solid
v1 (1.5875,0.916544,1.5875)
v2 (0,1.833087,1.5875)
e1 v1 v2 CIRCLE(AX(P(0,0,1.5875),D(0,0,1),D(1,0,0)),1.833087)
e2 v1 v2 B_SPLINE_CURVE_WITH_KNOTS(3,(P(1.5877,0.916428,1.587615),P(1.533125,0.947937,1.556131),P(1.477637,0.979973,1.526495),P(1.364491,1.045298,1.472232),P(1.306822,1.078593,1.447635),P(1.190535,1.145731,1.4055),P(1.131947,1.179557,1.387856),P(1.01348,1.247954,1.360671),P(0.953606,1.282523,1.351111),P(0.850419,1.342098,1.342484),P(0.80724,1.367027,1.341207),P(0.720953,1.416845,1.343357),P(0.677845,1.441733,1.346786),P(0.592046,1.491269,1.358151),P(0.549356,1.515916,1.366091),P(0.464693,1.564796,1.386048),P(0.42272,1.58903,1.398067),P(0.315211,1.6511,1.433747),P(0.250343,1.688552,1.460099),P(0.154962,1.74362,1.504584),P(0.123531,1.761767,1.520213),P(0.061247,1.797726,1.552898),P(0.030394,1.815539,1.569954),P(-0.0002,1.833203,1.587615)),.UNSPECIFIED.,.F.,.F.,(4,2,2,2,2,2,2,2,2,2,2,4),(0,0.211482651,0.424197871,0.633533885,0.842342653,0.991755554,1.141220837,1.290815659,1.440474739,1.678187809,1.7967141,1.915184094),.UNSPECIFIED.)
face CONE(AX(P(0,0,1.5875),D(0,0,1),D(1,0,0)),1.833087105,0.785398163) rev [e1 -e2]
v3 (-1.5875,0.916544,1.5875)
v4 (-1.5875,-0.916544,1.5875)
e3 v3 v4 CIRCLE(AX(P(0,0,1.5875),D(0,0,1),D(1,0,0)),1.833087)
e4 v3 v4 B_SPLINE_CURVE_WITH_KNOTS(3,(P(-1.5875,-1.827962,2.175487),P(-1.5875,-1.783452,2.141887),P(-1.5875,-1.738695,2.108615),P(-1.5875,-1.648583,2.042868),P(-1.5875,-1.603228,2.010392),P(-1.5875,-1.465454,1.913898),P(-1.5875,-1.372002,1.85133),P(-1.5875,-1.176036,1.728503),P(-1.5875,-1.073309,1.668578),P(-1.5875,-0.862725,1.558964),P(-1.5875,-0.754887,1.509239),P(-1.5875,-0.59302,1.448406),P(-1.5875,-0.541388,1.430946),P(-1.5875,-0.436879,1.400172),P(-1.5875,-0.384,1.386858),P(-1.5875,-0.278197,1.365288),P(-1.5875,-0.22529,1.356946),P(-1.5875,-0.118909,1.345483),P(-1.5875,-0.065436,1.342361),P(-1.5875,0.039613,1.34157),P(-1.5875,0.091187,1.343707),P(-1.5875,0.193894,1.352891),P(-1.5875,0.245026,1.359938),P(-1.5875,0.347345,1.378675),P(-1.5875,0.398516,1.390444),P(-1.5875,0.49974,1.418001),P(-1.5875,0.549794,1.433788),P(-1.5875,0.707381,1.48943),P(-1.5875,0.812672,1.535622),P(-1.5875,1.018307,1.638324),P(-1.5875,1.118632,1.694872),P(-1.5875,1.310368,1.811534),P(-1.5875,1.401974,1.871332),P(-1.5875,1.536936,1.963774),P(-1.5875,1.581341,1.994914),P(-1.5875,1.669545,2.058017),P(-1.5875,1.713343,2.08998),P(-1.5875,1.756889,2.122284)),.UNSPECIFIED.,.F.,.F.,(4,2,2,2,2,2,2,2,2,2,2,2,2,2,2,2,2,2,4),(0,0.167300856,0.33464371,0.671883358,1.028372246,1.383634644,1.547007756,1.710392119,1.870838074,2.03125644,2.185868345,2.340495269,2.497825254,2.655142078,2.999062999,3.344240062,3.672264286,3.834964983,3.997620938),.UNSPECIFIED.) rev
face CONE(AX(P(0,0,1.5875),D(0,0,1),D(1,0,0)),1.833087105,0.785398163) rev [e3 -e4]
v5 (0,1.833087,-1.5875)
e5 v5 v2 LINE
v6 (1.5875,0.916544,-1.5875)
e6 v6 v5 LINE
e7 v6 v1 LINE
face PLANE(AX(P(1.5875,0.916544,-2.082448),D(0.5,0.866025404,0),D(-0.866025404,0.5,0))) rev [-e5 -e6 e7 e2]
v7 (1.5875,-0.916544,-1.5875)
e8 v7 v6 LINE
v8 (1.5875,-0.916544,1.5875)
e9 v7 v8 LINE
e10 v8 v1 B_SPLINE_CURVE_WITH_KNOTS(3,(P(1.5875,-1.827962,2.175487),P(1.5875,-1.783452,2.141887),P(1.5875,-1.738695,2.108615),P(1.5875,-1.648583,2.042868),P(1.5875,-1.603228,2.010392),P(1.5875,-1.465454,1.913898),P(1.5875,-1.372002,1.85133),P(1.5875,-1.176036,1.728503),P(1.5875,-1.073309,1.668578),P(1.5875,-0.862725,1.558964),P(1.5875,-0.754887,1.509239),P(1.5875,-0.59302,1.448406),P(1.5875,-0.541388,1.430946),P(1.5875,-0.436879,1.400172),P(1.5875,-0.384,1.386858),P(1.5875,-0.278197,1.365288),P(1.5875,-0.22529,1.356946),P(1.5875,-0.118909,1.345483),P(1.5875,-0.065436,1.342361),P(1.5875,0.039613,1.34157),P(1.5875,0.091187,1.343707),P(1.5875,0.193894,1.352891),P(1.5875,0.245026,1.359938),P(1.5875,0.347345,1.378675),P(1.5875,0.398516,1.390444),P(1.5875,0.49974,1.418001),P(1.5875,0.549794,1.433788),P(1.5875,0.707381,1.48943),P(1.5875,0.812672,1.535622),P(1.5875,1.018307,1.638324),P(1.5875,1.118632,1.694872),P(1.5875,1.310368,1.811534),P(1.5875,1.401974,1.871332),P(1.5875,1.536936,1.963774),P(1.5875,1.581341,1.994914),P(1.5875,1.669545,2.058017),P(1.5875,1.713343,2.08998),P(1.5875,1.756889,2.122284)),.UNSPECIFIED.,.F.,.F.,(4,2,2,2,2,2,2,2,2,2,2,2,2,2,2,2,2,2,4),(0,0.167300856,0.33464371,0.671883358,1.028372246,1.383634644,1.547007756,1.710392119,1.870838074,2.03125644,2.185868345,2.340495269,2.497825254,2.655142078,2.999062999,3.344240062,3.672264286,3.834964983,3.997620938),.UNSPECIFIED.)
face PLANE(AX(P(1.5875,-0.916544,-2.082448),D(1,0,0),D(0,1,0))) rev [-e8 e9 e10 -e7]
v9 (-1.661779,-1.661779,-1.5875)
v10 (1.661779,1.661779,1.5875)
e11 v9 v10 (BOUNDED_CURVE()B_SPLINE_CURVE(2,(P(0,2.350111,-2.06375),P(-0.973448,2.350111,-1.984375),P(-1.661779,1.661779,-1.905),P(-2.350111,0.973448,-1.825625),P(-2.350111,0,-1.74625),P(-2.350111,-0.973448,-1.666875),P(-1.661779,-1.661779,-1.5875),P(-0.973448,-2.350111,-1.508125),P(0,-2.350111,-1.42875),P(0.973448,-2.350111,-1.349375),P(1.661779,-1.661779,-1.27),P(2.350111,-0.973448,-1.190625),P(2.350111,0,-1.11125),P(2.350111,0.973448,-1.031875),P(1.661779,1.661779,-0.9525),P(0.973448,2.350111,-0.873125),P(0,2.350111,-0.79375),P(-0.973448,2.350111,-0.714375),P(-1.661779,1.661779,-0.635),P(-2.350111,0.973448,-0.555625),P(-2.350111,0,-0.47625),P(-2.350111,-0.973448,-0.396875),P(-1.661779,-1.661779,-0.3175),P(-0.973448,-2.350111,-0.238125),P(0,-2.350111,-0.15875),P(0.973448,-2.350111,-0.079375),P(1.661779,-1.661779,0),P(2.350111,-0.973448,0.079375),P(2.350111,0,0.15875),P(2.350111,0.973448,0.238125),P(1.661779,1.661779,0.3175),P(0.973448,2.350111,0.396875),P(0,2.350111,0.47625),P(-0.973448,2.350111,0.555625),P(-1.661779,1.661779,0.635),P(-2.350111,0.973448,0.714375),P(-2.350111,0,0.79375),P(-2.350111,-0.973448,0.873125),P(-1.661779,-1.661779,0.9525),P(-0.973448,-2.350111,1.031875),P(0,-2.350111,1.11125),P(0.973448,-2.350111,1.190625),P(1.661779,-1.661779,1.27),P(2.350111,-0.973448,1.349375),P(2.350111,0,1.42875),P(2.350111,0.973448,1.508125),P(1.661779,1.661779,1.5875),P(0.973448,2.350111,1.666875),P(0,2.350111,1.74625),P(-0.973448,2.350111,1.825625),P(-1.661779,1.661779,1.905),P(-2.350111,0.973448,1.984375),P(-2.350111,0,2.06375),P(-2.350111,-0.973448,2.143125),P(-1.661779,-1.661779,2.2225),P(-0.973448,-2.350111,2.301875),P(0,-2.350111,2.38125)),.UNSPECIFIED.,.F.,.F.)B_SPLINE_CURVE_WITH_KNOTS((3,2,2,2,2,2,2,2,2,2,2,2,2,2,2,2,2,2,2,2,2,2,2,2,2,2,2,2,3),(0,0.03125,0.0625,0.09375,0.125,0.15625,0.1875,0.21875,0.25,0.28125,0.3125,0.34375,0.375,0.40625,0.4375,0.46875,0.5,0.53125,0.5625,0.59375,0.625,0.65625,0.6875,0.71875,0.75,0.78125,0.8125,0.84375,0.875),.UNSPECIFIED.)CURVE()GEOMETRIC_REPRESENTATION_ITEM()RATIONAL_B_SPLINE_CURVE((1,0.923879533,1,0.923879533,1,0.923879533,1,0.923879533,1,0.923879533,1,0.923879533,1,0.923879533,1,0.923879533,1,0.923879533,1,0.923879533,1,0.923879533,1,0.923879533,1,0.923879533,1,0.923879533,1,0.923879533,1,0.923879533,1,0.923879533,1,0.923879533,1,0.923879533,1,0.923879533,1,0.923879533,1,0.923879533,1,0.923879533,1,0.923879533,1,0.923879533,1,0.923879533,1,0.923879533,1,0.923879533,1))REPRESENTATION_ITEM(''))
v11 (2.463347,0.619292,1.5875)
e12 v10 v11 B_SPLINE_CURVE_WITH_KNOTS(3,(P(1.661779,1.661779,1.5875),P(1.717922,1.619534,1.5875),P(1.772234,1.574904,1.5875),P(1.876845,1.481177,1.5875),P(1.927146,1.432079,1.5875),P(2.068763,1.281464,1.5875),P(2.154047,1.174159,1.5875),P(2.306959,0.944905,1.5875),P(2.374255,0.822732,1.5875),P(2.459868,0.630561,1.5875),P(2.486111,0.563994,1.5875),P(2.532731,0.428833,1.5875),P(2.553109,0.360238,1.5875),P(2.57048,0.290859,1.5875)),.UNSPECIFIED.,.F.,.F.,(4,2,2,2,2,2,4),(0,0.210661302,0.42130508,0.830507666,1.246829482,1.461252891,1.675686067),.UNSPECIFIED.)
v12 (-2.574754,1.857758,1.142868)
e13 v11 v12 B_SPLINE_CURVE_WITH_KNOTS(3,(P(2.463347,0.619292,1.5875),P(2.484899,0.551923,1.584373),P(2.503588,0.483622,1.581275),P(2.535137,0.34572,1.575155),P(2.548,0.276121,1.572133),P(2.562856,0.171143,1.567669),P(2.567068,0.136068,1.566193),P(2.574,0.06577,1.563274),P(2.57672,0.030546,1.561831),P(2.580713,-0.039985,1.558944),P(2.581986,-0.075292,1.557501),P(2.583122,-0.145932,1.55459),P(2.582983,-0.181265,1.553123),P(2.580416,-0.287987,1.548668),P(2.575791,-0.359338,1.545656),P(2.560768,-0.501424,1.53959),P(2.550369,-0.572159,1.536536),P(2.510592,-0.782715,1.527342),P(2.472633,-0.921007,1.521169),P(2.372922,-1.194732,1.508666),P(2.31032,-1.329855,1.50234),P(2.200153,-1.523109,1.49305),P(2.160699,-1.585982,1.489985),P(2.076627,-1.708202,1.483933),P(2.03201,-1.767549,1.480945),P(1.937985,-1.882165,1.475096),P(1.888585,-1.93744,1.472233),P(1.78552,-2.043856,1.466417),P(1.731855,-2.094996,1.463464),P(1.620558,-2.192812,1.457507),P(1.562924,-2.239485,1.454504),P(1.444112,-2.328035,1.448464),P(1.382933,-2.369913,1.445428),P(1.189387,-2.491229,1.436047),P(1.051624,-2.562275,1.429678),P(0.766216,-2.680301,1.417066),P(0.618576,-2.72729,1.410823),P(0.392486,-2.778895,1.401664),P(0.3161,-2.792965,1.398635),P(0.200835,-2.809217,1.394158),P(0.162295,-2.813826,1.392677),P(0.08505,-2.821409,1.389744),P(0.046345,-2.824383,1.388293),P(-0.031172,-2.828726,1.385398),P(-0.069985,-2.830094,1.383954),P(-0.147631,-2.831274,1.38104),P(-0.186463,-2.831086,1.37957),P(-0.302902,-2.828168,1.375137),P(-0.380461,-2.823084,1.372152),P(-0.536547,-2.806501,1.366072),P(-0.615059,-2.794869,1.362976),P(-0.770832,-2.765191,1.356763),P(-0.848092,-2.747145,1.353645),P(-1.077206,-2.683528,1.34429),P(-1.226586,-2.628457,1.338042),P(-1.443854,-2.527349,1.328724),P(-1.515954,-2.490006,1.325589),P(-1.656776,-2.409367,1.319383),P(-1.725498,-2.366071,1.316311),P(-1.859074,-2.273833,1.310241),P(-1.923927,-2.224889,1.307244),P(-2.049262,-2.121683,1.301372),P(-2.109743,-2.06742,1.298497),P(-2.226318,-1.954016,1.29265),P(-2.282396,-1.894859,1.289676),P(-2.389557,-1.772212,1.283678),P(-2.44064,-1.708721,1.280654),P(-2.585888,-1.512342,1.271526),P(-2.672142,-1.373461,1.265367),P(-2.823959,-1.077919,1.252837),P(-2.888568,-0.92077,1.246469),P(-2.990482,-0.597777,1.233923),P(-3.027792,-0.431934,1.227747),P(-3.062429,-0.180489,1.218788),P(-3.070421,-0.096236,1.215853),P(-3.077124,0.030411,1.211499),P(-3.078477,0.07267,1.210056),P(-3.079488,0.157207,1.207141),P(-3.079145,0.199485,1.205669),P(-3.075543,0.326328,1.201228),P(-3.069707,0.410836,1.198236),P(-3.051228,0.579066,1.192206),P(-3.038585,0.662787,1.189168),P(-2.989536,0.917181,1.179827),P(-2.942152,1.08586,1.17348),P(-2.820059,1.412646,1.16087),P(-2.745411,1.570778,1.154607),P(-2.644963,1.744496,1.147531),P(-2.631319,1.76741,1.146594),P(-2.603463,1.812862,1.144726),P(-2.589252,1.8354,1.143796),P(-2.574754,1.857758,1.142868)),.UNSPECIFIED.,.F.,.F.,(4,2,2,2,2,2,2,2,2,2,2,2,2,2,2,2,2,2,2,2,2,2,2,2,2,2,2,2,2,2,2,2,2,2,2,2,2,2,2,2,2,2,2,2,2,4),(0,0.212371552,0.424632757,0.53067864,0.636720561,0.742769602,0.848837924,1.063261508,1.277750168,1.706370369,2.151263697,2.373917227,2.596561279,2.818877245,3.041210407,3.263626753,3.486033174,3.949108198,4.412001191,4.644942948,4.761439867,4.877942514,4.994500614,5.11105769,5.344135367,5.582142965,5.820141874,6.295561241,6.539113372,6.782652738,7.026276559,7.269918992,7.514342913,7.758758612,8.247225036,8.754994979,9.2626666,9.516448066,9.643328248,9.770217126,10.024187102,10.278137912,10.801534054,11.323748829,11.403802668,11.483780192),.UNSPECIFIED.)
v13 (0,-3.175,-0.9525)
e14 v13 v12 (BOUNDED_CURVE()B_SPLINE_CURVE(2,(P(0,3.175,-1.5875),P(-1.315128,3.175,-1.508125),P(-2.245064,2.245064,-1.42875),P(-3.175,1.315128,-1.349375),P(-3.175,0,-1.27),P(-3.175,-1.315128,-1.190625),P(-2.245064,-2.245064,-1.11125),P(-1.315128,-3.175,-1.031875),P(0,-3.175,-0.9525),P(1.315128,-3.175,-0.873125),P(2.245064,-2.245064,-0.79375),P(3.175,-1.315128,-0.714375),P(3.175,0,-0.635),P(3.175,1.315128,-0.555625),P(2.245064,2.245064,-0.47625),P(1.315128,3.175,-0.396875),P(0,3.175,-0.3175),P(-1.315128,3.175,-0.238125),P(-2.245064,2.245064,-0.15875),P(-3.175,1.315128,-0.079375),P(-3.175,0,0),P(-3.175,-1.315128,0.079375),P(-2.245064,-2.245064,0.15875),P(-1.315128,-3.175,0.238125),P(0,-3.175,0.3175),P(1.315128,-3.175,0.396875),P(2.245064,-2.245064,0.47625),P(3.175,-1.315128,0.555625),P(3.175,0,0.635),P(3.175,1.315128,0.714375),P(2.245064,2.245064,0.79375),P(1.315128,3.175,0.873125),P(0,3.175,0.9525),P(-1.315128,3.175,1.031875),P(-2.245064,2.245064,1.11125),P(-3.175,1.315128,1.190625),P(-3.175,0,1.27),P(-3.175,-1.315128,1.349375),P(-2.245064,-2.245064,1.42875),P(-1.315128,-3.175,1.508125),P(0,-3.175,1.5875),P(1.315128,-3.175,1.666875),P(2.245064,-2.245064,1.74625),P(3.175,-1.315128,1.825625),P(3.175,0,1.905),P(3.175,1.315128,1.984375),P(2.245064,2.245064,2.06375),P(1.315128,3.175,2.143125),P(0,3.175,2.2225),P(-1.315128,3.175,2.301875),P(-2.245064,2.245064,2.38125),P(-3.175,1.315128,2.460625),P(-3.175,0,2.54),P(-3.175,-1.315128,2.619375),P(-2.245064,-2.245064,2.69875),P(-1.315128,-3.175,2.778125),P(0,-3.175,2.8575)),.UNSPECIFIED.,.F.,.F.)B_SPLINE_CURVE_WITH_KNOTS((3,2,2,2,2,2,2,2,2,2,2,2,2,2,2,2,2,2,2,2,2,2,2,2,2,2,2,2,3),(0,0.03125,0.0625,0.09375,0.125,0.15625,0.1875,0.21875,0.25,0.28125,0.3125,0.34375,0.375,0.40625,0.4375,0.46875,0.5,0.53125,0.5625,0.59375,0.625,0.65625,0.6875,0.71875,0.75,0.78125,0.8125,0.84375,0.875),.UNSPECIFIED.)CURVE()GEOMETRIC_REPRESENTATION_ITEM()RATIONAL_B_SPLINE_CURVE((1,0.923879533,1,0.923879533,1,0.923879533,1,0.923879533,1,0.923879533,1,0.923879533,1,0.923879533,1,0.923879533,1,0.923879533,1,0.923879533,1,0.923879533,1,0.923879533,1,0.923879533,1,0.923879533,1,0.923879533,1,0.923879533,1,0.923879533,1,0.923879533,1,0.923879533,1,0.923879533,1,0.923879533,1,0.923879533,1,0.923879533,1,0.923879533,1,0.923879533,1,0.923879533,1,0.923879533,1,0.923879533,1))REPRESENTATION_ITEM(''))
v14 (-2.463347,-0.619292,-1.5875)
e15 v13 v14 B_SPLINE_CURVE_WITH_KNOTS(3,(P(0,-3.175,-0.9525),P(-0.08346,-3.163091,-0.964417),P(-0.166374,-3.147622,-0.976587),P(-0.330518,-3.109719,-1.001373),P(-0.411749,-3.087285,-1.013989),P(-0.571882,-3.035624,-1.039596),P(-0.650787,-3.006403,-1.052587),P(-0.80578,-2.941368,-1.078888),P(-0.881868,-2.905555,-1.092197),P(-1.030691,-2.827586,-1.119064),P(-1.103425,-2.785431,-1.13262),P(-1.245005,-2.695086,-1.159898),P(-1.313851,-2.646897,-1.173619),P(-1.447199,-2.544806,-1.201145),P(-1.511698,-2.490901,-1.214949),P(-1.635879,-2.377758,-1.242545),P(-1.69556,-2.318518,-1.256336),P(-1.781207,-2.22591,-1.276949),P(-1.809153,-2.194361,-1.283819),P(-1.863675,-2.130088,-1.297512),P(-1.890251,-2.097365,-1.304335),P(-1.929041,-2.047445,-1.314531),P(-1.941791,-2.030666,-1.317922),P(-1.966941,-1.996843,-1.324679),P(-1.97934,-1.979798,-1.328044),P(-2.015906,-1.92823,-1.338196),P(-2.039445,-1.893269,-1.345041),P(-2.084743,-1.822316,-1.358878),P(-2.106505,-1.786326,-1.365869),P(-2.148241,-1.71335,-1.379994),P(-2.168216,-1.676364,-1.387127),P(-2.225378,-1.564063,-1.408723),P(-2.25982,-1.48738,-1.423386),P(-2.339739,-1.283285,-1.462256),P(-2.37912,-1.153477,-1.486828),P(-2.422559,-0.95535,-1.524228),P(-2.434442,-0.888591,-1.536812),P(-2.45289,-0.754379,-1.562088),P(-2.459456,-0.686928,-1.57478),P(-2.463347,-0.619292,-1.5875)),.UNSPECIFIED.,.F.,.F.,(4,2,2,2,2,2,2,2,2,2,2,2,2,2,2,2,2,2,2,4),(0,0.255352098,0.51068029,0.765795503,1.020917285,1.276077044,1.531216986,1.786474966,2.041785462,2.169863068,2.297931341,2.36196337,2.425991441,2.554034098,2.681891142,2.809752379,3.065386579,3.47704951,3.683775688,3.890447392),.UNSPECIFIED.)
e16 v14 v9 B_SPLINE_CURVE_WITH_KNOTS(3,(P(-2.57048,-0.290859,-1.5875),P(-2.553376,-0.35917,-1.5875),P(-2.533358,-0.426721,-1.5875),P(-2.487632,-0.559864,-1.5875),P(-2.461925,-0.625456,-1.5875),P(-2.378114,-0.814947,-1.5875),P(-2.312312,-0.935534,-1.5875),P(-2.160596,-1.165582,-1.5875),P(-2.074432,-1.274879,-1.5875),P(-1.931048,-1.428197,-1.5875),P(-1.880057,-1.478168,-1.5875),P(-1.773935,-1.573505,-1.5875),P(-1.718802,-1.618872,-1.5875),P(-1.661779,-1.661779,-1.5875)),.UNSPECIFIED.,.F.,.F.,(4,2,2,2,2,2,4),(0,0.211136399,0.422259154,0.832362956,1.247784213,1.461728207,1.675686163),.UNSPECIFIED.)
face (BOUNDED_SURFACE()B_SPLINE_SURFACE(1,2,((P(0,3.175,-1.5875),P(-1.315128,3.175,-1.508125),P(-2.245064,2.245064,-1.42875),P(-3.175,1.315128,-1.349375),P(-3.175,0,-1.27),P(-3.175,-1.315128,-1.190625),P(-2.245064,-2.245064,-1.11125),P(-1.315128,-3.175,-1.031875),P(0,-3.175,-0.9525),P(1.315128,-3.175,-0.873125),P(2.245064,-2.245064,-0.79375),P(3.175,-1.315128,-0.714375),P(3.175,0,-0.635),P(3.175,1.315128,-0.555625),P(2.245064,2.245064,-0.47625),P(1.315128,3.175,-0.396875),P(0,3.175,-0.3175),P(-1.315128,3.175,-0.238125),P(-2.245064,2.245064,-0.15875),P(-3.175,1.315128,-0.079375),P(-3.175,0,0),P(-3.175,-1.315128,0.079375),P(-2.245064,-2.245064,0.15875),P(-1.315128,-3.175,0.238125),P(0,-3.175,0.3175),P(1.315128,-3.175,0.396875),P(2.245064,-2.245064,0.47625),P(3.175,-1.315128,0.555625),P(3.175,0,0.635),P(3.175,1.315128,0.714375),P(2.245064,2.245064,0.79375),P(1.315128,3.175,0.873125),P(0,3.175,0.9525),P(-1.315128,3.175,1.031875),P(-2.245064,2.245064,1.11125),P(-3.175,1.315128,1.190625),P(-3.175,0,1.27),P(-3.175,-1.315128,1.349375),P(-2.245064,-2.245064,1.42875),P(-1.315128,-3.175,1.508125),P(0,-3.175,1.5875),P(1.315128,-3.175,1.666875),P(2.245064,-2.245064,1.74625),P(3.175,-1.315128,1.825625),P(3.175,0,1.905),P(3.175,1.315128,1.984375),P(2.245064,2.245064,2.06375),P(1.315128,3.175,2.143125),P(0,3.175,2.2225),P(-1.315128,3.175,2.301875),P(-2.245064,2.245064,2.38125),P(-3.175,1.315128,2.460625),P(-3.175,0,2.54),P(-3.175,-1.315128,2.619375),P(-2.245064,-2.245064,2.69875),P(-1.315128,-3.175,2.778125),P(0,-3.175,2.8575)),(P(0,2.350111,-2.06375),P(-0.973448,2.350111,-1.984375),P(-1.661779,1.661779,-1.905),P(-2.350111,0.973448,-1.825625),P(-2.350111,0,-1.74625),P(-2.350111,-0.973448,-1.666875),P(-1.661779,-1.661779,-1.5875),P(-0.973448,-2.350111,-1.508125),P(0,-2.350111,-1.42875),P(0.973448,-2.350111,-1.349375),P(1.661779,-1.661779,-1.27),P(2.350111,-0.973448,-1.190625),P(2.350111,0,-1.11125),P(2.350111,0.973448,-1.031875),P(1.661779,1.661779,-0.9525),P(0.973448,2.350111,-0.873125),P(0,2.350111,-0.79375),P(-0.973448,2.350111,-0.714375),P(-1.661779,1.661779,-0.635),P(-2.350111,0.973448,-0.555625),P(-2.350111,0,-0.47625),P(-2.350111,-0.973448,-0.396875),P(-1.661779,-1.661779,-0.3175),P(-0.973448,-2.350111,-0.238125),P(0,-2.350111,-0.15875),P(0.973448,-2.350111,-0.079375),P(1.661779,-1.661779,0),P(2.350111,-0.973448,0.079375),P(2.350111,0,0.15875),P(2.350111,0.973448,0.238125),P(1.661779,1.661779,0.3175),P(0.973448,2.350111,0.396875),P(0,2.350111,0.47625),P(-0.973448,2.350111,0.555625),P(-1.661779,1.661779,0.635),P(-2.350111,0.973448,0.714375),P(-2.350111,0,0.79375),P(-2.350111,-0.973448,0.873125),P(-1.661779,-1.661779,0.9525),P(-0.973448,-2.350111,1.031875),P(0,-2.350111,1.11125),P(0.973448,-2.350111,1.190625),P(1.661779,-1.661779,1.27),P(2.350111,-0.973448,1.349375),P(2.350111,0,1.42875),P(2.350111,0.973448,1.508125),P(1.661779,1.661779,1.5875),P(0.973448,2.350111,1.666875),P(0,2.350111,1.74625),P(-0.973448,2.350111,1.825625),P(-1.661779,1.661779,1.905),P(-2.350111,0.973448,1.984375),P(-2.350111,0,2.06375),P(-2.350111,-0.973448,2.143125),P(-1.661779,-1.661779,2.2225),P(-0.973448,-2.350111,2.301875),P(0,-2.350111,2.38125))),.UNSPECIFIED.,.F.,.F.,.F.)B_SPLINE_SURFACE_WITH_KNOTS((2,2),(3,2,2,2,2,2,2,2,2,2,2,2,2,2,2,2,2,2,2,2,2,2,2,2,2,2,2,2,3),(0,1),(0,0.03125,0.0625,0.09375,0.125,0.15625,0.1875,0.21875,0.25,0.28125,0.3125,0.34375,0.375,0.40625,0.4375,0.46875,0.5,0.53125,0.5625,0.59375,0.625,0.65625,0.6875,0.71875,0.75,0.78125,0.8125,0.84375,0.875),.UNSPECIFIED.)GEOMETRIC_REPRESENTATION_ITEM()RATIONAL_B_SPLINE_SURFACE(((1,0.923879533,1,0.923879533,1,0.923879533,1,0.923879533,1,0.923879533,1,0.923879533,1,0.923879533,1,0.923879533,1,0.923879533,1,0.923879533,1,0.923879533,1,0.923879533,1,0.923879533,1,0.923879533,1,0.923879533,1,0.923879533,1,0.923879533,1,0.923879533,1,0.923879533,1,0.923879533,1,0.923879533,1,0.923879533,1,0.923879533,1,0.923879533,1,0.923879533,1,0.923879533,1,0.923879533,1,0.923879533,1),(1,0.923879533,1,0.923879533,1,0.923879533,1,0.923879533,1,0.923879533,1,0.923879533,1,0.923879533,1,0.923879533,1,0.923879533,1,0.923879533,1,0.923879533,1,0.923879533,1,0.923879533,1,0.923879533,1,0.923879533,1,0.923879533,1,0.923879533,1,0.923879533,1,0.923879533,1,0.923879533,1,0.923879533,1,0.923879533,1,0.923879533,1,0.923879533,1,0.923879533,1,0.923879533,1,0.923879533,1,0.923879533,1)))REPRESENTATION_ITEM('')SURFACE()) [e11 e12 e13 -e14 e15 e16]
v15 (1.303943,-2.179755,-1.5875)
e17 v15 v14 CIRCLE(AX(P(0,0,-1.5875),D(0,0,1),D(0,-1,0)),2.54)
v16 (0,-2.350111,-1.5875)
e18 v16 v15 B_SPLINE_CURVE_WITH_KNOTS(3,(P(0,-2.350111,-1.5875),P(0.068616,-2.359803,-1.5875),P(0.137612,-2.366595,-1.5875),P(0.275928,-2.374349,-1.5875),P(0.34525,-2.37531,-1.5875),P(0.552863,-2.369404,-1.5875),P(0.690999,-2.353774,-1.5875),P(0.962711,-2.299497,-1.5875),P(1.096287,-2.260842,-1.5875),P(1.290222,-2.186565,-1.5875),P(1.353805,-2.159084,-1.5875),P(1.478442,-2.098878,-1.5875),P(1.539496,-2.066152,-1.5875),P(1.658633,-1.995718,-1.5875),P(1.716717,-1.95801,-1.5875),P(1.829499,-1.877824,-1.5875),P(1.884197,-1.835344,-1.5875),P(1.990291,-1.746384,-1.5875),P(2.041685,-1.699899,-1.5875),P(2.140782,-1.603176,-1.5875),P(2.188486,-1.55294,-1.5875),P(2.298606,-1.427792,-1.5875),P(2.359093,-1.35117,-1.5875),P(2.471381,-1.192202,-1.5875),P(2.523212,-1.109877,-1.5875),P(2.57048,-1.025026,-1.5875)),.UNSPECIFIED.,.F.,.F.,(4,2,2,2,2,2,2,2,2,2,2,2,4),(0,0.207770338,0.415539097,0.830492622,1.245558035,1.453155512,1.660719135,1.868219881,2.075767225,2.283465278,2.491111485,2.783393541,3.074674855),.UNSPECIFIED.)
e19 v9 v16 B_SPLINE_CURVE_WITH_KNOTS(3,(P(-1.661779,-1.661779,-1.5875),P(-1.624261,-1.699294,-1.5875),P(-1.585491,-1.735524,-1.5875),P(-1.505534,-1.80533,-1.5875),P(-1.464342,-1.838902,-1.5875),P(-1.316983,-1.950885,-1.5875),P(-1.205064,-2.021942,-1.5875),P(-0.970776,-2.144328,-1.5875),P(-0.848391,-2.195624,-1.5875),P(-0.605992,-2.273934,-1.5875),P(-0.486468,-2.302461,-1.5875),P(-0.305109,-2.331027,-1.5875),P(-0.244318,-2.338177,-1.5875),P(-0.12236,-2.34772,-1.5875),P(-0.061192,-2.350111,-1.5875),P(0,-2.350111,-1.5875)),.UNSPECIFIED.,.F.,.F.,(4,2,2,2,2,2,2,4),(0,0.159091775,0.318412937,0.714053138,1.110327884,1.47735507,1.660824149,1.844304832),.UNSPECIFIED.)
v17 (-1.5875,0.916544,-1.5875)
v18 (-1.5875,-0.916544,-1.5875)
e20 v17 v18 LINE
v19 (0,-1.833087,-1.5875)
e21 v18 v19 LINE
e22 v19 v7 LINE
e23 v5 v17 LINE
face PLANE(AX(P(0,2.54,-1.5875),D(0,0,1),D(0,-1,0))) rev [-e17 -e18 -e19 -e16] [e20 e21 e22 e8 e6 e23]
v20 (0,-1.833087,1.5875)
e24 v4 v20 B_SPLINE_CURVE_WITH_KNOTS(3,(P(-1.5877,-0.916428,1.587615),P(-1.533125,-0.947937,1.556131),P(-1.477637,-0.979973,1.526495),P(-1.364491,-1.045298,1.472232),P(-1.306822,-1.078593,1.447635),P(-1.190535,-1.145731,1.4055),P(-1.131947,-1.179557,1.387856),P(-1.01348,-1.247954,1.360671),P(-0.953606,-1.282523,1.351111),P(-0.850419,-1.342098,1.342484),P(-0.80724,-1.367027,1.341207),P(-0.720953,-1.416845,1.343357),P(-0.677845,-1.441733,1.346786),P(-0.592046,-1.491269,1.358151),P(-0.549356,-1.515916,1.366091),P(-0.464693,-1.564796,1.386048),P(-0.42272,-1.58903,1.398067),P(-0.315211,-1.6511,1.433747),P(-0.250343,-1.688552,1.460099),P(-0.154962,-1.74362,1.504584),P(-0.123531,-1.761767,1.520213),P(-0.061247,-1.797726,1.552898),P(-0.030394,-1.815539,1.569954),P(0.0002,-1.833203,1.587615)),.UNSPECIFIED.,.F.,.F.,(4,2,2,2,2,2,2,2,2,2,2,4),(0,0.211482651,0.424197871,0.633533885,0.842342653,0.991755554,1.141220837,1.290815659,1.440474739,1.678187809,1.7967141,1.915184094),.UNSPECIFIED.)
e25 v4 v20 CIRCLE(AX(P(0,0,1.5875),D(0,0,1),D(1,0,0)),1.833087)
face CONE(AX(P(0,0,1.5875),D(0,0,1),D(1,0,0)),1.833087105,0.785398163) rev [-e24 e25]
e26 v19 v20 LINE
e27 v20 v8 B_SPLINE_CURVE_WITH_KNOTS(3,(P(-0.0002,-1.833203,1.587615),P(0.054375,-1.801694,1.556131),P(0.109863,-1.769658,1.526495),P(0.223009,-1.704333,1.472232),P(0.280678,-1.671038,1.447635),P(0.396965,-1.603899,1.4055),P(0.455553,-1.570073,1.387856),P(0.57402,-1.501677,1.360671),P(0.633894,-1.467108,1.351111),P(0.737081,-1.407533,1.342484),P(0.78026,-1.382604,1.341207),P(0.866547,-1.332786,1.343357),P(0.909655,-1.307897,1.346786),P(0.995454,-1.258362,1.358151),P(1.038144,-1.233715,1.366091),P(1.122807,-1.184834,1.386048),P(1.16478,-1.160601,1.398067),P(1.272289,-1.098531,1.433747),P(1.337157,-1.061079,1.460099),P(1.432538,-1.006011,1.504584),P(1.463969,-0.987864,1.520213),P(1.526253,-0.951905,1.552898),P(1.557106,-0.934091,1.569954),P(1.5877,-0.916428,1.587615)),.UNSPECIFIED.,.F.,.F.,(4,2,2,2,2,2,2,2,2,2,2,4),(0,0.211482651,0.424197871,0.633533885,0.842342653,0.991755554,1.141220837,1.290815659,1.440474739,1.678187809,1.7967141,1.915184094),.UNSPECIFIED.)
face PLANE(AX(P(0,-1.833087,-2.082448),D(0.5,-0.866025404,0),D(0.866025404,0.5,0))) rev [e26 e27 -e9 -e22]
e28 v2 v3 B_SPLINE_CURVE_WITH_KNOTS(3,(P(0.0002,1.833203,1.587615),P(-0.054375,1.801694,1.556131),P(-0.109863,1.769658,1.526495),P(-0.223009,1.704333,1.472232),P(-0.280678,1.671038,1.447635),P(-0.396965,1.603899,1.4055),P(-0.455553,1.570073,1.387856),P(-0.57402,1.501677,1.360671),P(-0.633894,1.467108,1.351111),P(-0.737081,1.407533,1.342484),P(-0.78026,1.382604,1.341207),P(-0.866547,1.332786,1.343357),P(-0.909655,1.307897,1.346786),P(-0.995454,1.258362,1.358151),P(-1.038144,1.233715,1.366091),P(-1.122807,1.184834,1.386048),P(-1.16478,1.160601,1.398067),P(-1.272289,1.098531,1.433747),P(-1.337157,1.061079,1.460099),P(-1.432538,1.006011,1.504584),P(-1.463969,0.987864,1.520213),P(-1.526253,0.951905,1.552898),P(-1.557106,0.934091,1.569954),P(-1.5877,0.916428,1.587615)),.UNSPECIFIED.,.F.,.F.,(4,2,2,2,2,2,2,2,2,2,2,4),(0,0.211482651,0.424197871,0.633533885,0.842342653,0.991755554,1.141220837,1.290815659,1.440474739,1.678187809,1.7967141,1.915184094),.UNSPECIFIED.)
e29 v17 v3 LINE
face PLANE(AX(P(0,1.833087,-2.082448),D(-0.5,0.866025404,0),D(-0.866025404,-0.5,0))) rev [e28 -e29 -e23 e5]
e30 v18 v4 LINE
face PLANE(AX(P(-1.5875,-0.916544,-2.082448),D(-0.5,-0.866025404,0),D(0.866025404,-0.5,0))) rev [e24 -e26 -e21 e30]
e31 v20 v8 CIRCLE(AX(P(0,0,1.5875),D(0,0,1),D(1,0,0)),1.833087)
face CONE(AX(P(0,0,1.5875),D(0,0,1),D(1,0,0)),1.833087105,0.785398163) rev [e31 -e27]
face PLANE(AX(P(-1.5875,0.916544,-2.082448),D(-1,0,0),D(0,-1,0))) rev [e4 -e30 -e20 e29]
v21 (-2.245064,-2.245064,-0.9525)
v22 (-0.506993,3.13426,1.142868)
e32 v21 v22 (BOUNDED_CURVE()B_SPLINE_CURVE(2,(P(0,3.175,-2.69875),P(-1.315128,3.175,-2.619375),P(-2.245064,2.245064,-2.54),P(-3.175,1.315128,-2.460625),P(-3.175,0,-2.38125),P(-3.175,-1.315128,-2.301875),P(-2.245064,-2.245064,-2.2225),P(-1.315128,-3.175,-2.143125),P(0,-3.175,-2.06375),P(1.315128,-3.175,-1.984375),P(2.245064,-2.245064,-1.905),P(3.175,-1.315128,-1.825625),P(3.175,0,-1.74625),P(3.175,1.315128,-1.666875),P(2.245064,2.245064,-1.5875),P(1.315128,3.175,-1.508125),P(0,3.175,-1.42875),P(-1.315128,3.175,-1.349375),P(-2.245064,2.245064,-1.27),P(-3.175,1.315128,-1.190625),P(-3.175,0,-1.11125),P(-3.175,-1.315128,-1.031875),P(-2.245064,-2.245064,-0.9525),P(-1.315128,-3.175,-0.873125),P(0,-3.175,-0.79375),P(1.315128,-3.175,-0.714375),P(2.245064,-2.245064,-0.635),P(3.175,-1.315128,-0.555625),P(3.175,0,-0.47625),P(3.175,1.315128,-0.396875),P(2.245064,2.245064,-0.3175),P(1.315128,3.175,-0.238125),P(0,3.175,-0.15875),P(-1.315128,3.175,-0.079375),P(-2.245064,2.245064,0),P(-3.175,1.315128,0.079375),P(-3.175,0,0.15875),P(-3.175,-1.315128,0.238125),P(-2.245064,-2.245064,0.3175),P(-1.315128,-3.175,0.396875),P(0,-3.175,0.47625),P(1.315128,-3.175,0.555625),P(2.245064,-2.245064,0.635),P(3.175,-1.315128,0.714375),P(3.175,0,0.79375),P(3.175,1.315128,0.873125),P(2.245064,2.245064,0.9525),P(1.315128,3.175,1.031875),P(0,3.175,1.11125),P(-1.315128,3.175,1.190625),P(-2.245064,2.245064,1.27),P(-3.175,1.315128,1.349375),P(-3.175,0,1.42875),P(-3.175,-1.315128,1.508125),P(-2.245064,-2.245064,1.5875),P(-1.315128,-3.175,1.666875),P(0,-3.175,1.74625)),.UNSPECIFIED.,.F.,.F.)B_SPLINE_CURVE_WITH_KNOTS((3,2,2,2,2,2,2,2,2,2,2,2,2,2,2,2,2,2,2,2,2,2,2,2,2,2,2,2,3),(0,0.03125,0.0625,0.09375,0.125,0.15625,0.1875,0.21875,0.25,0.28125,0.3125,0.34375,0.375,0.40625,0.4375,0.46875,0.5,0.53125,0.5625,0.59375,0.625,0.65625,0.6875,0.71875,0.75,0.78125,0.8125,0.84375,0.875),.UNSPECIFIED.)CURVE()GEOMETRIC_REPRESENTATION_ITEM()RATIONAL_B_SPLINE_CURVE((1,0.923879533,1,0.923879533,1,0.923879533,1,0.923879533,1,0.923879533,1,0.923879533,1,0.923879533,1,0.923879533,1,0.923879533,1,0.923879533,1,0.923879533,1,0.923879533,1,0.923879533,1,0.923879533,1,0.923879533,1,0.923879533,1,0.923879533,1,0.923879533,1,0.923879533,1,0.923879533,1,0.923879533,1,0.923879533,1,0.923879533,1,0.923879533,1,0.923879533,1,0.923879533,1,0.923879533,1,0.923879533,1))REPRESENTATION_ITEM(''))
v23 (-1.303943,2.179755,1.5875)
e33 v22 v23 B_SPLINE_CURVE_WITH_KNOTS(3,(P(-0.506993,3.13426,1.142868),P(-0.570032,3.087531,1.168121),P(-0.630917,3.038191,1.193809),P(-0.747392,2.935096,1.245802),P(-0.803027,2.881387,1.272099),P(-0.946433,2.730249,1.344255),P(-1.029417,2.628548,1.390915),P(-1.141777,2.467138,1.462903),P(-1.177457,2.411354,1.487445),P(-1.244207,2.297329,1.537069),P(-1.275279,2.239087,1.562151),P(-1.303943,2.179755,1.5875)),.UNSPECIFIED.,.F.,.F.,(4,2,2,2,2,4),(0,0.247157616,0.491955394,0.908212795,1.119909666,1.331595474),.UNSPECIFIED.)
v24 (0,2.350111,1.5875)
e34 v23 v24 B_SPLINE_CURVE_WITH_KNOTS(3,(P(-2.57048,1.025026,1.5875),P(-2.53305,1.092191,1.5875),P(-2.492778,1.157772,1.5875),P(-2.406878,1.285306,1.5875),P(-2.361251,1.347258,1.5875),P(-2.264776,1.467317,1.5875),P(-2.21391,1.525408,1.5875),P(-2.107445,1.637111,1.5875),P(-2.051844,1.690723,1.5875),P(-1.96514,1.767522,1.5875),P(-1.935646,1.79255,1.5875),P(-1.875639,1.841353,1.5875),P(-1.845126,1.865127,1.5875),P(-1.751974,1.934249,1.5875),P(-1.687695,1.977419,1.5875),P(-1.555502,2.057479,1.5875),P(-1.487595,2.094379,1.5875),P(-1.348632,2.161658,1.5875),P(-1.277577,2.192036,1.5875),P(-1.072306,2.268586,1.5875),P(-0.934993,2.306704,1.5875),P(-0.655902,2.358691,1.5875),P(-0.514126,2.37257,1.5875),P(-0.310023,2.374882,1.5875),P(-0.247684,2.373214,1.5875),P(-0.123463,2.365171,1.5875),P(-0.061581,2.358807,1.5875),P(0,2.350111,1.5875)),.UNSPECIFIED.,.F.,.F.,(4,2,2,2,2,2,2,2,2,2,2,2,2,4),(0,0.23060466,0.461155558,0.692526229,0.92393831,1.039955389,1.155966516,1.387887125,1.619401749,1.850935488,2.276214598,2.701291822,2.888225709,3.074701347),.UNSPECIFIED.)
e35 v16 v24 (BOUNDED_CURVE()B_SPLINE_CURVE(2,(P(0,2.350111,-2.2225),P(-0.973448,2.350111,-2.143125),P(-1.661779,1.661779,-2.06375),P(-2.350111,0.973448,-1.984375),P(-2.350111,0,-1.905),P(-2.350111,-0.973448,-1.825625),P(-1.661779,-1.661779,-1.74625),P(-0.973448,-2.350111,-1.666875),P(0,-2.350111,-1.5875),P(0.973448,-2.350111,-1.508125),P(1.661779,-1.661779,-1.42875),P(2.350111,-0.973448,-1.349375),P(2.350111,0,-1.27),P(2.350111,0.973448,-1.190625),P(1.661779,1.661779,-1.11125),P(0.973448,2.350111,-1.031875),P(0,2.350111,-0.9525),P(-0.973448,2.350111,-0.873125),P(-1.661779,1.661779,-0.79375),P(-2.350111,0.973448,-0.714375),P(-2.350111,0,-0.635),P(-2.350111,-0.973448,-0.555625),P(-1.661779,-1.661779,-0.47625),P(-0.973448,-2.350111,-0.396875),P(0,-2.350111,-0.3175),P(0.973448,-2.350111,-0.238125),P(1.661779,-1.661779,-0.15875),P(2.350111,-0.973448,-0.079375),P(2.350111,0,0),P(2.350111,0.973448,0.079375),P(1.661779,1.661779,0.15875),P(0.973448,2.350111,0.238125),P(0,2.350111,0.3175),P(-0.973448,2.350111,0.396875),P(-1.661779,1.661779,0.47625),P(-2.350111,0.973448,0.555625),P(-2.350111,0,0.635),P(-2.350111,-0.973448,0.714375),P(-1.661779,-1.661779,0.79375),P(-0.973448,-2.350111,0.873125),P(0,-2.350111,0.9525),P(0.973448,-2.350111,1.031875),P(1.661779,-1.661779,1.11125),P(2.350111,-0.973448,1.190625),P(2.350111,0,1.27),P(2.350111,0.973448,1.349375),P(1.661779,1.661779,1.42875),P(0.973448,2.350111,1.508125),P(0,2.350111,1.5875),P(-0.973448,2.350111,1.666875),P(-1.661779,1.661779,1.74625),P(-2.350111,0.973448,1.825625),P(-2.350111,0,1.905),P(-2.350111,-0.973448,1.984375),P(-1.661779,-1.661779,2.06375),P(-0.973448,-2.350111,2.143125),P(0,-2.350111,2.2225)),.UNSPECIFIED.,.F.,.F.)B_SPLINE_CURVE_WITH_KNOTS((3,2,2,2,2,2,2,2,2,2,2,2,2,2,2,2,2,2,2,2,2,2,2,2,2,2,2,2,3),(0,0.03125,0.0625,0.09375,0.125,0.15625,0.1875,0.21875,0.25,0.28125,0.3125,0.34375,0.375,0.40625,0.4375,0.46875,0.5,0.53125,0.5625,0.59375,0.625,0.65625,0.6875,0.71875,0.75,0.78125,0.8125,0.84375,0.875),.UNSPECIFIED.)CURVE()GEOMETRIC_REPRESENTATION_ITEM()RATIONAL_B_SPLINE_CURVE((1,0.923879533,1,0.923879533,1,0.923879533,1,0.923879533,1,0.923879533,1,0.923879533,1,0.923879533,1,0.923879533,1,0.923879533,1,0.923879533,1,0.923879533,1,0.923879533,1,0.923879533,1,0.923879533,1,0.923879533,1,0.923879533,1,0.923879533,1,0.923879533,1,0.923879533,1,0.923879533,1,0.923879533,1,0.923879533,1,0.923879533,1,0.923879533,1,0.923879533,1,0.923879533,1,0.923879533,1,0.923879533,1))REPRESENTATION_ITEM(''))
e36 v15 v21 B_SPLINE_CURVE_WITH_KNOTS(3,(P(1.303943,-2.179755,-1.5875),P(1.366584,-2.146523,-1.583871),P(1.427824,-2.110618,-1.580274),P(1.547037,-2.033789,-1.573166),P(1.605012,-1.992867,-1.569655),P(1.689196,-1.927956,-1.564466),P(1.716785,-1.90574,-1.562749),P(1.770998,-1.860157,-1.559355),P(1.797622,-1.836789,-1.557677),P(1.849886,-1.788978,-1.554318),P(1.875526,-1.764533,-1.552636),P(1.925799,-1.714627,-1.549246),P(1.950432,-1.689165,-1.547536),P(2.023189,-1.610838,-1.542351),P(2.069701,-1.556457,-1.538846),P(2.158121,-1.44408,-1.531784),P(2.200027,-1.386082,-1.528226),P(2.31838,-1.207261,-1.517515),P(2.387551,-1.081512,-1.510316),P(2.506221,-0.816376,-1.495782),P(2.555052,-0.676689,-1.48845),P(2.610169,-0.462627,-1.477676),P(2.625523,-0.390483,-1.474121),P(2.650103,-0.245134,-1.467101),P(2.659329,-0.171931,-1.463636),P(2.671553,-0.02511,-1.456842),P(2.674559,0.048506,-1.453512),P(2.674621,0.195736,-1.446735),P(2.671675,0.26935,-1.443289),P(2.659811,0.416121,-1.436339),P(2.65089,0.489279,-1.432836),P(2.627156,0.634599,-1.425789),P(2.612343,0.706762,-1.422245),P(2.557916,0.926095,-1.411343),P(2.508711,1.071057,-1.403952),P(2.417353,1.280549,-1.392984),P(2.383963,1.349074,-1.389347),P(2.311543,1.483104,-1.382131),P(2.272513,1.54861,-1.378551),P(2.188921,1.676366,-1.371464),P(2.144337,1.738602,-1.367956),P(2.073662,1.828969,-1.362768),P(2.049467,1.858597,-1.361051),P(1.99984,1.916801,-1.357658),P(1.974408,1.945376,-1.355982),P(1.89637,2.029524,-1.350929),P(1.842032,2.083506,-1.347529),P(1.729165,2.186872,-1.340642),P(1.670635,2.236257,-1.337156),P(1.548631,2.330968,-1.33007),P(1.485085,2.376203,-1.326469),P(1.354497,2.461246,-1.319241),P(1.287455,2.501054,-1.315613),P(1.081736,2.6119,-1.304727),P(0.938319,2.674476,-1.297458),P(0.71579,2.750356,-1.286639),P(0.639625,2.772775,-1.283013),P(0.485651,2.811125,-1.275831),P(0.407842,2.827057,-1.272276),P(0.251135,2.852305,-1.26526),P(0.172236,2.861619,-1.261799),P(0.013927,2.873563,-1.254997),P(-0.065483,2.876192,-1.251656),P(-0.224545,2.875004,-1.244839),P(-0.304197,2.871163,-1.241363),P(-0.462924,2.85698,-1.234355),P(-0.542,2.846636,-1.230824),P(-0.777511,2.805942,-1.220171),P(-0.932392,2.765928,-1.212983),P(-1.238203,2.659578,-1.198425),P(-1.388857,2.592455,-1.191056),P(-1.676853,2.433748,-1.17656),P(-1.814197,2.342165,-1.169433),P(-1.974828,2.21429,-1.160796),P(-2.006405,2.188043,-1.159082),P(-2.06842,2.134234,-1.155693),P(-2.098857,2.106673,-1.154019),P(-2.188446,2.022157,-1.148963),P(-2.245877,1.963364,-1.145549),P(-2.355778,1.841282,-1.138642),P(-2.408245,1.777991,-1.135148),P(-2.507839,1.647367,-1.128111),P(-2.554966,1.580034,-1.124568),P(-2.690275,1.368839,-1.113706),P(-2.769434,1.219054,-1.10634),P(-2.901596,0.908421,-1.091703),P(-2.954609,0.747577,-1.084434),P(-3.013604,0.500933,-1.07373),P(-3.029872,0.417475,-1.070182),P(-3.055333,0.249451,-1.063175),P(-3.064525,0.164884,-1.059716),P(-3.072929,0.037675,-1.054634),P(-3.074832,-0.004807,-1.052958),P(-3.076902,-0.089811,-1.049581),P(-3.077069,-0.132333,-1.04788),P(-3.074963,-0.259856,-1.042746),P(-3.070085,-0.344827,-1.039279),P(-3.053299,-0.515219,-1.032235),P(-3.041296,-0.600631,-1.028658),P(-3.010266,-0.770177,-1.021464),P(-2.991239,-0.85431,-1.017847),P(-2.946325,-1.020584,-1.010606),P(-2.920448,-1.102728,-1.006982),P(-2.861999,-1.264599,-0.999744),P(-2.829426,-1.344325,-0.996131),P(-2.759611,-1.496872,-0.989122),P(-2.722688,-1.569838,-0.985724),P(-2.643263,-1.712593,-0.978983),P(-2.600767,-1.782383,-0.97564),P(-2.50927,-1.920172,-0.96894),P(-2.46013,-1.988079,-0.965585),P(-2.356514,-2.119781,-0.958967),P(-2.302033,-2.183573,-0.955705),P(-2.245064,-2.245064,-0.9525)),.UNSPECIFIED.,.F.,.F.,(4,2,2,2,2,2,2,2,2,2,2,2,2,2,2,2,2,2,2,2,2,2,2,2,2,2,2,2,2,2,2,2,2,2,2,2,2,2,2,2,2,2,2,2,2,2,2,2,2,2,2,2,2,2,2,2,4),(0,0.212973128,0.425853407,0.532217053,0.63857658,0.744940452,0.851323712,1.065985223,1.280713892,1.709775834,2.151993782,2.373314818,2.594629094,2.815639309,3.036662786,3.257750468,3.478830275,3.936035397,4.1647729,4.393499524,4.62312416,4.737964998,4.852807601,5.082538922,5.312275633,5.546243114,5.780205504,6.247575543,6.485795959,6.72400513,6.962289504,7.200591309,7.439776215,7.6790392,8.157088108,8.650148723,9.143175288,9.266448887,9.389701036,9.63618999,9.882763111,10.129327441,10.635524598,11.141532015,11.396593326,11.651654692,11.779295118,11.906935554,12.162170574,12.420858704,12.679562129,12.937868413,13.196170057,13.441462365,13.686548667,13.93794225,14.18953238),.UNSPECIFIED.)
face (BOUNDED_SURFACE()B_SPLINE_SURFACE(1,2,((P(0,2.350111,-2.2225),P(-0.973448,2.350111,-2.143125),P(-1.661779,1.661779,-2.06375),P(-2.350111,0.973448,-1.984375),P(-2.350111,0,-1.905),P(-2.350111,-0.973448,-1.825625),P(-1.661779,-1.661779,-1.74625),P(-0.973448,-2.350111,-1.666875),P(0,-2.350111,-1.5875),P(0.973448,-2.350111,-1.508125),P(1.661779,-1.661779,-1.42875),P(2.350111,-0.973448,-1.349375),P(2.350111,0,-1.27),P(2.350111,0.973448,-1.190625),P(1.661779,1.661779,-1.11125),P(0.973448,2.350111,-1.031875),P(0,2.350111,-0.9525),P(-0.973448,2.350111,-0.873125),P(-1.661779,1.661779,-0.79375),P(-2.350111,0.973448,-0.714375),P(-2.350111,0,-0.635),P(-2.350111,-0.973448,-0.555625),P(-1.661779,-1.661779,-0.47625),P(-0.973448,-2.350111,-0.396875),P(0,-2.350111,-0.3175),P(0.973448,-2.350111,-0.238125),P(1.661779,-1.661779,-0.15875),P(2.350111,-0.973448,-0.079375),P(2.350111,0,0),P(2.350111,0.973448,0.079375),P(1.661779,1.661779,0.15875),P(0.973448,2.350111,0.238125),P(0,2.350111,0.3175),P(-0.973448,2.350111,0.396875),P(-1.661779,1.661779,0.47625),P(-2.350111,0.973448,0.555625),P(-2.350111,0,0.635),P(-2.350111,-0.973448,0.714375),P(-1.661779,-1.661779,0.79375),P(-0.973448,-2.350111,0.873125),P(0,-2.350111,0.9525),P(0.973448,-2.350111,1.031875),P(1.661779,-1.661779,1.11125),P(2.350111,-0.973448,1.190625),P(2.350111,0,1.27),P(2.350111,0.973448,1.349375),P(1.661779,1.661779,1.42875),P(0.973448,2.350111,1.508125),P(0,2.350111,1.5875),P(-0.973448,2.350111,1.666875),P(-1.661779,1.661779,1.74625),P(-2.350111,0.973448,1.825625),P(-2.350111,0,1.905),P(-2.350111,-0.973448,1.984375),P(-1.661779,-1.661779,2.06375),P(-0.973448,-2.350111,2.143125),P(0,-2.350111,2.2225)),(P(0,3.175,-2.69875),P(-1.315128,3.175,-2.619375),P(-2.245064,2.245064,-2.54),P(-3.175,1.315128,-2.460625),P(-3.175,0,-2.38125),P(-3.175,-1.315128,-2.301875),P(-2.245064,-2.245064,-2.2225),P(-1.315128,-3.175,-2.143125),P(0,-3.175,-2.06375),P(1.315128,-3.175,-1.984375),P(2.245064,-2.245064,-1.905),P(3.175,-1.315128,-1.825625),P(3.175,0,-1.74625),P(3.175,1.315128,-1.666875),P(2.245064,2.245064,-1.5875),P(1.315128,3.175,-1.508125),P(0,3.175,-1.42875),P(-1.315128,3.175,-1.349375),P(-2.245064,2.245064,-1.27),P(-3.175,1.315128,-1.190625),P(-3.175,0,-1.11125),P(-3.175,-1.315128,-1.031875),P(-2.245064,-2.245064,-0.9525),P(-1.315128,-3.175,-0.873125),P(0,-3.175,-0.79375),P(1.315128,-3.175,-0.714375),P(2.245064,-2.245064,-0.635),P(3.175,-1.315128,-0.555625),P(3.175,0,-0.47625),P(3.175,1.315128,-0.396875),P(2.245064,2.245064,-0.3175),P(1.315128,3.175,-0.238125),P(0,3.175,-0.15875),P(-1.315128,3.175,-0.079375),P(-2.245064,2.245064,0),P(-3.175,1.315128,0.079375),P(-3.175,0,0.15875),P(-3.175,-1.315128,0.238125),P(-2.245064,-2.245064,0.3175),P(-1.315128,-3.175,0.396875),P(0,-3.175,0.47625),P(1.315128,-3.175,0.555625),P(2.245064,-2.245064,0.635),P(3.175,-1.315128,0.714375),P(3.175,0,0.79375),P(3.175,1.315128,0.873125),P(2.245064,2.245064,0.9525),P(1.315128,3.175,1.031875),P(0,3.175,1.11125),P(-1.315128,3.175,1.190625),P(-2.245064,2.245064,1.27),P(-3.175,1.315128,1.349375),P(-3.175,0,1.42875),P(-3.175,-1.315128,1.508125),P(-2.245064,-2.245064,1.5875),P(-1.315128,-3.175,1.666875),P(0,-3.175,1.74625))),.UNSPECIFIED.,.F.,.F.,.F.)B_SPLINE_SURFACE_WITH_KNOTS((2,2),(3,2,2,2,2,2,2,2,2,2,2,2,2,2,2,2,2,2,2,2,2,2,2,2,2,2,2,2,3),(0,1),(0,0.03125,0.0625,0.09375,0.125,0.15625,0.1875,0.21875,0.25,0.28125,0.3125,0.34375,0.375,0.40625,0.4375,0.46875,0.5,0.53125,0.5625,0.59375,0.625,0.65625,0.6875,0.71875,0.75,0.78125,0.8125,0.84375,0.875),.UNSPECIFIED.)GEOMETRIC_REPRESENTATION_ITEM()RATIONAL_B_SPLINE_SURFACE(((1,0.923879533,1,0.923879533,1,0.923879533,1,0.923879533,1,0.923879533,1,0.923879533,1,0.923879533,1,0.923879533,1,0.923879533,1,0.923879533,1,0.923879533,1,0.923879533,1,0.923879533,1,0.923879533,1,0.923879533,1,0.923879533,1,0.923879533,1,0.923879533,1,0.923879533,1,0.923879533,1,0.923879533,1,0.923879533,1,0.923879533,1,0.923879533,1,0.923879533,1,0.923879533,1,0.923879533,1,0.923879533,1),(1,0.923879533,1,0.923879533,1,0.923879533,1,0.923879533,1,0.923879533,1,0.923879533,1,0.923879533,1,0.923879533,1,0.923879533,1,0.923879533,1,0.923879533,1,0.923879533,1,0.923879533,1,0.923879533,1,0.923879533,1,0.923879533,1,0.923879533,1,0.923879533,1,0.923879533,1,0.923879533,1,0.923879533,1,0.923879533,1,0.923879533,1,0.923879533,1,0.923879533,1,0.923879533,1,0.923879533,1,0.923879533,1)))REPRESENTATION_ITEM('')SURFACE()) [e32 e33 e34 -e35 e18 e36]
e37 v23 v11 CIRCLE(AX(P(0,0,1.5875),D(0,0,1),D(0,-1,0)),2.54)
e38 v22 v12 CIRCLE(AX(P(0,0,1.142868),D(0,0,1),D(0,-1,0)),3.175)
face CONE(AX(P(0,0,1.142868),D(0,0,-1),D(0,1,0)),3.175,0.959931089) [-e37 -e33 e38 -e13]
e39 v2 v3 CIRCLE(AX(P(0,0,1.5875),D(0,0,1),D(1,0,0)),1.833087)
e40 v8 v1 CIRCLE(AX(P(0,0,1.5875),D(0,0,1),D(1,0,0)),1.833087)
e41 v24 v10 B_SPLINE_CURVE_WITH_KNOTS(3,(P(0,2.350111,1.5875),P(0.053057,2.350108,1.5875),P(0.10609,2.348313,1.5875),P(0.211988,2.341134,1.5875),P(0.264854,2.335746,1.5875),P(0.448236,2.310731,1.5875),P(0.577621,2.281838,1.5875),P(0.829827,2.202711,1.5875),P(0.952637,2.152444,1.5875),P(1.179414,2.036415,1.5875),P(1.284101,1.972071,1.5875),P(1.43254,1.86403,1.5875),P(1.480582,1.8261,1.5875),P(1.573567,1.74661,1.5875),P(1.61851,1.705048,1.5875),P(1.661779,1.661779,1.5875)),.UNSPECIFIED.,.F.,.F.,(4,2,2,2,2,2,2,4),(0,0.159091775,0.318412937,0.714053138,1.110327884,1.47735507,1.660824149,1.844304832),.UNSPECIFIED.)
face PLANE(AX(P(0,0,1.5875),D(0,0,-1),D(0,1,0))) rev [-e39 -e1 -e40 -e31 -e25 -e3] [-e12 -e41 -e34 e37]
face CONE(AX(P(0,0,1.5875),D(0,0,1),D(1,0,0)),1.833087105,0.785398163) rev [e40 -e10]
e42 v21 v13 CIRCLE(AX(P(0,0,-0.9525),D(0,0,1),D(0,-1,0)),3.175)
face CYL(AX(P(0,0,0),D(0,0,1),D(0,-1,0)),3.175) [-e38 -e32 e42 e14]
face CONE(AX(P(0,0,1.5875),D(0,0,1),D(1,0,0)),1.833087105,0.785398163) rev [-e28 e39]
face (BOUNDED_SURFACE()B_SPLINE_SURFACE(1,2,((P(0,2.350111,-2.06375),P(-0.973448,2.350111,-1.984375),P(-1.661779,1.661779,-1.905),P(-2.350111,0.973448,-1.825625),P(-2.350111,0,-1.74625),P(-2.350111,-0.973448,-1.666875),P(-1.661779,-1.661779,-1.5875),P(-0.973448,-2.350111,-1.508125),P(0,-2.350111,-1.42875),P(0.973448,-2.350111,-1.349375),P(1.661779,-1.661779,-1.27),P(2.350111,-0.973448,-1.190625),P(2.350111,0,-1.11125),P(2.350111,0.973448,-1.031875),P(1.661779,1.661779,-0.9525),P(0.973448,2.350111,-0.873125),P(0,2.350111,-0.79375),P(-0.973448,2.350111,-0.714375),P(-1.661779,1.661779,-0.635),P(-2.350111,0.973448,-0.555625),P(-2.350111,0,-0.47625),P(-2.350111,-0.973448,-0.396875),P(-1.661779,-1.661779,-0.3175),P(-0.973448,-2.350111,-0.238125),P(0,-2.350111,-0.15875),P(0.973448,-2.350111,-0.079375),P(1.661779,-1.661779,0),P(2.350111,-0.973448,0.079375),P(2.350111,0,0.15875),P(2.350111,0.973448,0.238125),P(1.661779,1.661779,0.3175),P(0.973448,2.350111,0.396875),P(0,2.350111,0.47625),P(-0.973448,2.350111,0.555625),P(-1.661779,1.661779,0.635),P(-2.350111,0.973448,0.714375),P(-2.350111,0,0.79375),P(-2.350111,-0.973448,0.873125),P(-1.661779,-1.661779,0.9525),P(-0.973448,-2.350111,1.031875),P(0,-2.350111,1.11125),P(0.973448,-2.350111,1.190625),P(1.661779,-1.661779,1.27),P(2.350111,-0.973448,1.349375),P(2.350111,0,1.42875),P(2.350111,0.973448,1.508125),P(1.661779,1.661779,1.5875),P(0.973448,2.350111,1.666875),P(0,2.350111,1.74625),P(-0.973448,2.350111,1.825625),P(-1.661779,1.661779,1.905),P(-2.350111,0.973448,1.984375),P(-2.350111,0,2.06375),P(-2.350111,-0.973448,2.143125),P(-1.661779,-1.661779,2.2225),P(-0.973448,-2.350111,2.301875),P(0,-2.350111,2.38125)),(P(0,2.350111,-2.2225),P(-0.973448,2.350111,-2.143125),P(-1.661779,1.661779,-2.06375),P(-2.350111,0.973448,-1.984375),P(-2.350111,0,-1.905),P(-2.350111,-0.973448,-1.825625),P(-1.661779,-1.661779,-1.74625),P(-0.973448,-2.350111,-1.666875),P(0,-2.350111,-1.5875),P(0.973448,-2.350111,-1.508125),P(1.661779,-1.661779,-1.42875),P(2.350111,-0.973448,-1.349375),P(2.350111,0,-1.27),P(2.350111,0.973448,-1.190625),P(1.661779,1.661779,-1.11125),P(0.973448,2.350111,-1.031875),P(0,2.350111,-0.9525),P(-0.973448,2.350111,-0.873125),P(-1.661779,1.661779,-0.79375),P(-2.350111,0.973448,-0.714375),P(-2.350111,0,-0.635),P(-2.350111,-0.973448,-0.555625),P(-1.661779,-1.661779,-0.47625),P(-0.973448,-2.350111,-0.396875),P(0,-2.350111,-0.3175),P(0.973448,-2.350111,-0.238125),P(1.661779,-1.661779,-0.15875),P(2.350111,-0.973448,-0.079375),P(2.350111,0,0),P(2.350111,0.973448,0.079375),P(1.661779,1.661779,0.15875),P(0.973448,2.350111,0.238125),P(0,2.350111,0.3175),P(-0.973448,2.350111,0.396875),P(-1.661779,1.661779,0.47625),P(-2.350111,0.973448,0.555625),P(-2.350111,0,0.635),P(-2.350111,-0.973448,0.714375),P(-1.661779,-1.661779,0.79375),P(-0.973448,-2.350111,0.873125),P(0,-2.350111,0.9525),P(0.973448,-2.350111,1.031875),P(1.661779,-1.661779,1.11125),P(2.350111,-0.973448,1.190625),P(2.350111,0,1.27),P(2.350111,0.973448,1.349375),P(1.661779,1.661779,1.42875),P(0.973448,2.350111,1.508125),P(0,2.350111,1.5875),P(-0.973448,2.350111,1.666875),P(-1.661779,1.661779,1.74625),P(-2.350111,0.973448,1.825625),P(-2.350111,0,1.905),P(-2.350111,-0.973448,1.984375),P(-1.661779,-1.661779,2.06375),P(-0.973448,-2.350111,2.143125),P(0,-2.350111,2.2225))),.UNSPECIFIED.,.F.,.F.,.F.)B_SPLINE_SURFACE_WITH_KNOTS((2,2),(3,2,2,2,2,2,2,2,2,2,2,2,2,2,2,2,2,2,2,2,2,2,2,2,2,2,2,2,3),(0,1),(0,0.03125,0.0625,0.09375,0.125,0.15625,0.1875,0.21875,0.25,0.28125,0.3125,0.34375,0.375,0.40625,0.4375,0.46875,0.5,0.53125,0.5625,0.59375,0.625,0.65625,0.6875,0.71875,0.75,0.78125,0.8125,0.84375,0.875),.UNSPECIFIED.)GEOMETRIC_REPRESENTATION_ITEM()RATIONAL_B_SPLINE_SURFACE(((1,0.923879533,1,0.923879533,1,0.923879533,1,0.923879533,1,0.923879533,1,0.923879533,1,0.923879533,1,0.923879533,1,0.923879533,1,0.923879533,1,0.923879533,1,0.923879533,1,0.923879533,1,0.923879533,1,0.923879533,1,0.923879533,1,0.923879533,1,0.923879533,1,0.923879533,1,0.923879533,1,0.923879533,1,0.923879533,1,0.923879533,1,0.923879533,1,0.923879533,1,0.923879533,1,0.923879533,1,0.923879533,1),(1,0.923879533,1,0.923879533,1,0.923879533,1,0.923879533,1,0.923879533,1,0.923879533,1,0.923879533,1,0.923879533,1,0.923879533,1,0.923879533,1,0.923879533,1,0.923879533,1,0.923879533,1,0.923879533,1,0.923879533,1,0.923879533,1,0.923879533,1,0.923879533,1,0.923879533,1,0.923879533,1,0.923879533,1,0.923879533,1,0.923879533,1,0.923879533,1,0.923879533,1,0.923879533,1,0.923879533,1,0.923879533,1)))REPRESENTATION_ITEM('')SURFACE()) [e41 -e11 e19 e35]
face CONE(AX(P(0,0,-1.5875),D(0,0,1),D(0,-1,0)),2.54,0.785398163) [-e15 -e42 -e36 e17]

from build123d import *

# Parameters (mm, degrees)
CUT_SWEEP2_PITCH    = 1.27
CUT_EXTRUDE10_DEPTH = 6.499261487


with BuildPart() as part:
    # Sketch22 → Revolve1 (revolve)
    with BuildSketch(Plane(origin=(0, 0, 0), x_dir=(0, 0, -1), z_dir=(1, 0, 0)), mode=Mode.PRIVATE) as revolve1_sk:
        Polygon((-1.5875, 0), (-1.5875, 2.54), (-1.142868213, 3.175), (0.9525, 3.175), (1.5875, 2.54), (1.5875, 0), (0, 0), align=None)
    revolve(revolve1_sk.sketch.rotate(Axis((0, 0, 0), (0, 0, -1)), 180), axis=Axis((0, 0, 0), (0, 0, -1)))

    # Cut-Sweep2: the profile of Sketch28 profile screwed along a right-hand helix of 3.5 turns, 8 arcs to a turn; built about Z, then put on its axis
    cut_sweep2_z = Axis((0, 0, 0), (0, 0, 1))
    cut_sweep2_corners = [(3.1753, 0, 0.000173205), (3.1753, 0, -1.111423205), (2.350110803, 0, -0.635), (2.350110803, 0, -0.47625)]
    with BuildLine(mode=Mode.PRIVATE) as cut_sweep2_profile:
        Line(cut_sweep2_corners[0], cut_sweep2_corners[1])
        Line(cut_sweep2_corners[1], cut_sweep2_corners[2])
        Line(cut_sweep2_corners[2], cut_sweep2_corners[3])
        Line(cut_sweep2_corners[3], cut_sweep2_corners[0])
    cut_sweep2_cap = Face(cut_sweep2_profile.wire())
    cut_sweep2_turn_angles = [0, 22.5, 45, 67.5, 90, 112.5, 135, 157.5, 180, 202.5, 225, 247.5, 270, 292.5, 315, 337.5, 360]
    cut_sweep2_turn_weights = [1, 0.9238795325112867, 1, 0.9238795325112867, 1, 0.9238795325112867, 1, 0.9238795325112867, 1, 0.9238795325112867, 1, 0.9238795325112867, 1, 0.9238795325112867, 1, 0.9238795325112867, 1]
    cut_sweep2_turn_rails = [Edge.make_bspline([Vector(p[0], p[1], 0).rotate(cut_sweep2_z, cut_sweep2_turn_angles[k]) / cut_sweep2_turn_weights[k] + Vector(0, 0, p[2] + CUT_SWEEP2_PITCH * cut_sweep2_turn_angles[k] / 360) for k in range(17)], [0, 0, 0, 1, 1, 2, 2, 3, 3, 4, 4, 5, 5, 6, 6, 7, 7, 8, 8, 8], 2, cut_sweep2_turn_weights) for p in cut_sweep2_corners]
    cut_sweep2_turn_sides = [Face.make_surface_from_curves(cut_sweep2_turn_rails[p[0]], cut_sweep2_turn_rails[p[1]]) for p in [(0, 1), (1, 2), (2, 3), (3, 0)]]
    cut_sweep2_last_angles = [1080, 1102.5, 1125, 1147.5, 1170, 1192.5, 1215, 1237.5, 1260]
    cut_sweep2_last_weights = [1, 0.9238795325112867, 1, 0.9238795325112867, 1, 0.9238795325112867, 1, 0.9238795325112769, 1]
    cut_sweep2_last_rails = [Edge.make_bspline([Vector(p[0], p[1], 0).rotate(cut_sweep2_z, cut_sweep2_last_angles[k]) / cut_sweep2_last_weights[k] + Vector(0, 0, p[2] + CUT_SWEEP2_PITCH * cut_sweep2_last_angles[k] / 360) for k in range(9)], [0, 0, 0, 1, 1, 2, 2, 3, 3, 4, 4, 4], 2, cut_sweep2_last_weights) for p in cut_sweep2_corners]
    cut_sweep2_last_sides = [Face.make_surface_from_curves(cut_sweep2_last_rails[p[0]], cut_sweep2_last_rails[p[1]]) for p in [(0, 1), (1, 2), (2, 3), (3, 0)]]
    cut_sweep2 = Plane(origin=(0, 0, -1.5875), x_dir=(0, 1, 0), z_dir=(0, 0, 1)) * Solid(Shell([*[p.moved(Location((0, 0, CUT_SWEEP2_PITCH * i))) for i in range(3) for p in cut_sweep2_turn_sides], *cut_sweep2_last_sides, cut_sweep2_cap, cut_sweep2_cap.rotate(cut_sweep2_z, 1260).moved(Location((0, 0, CUT_SWEEP2_PITCH * 1260 / 360)))]))
    add(cut_sweep2, mode=Mode.SUBTRACT)

    # Sketch23 → Cut-Extrude10 (cut, through all)
    with BuildSketch(Plane.XY.offset(1.5875)):
        Polygon((0, 1.833087105), (-1.5875, 0.916543552), (-1.5875, -0.916543552), (0, -1.833087105), (1.5875, -0.916543552), (1.5875, 0.916543552), align=None)
    extrude(amount=-CUT_EXTRUDE10_DEPTH, mode=Mode.SUBTRACT)

    # Cut-Extrude11 cone 1 section (through the dimple's axis) → Cut-Extrude11 (revolve, cut)
    with BuildSketch(Plane(origin=(0, 0, 1.5875), x_dir=(0, -1, 0), z_dir=(1, 0, 0))):
        Polygon((0, 0), (1.833087105, 0), (0, 1.833087105), align=None)
    revolve(axis=Axis((0, 0, 1.5875), (0, 0, -1)), mode=Mode.SUBTRACT)


solid = part.part
